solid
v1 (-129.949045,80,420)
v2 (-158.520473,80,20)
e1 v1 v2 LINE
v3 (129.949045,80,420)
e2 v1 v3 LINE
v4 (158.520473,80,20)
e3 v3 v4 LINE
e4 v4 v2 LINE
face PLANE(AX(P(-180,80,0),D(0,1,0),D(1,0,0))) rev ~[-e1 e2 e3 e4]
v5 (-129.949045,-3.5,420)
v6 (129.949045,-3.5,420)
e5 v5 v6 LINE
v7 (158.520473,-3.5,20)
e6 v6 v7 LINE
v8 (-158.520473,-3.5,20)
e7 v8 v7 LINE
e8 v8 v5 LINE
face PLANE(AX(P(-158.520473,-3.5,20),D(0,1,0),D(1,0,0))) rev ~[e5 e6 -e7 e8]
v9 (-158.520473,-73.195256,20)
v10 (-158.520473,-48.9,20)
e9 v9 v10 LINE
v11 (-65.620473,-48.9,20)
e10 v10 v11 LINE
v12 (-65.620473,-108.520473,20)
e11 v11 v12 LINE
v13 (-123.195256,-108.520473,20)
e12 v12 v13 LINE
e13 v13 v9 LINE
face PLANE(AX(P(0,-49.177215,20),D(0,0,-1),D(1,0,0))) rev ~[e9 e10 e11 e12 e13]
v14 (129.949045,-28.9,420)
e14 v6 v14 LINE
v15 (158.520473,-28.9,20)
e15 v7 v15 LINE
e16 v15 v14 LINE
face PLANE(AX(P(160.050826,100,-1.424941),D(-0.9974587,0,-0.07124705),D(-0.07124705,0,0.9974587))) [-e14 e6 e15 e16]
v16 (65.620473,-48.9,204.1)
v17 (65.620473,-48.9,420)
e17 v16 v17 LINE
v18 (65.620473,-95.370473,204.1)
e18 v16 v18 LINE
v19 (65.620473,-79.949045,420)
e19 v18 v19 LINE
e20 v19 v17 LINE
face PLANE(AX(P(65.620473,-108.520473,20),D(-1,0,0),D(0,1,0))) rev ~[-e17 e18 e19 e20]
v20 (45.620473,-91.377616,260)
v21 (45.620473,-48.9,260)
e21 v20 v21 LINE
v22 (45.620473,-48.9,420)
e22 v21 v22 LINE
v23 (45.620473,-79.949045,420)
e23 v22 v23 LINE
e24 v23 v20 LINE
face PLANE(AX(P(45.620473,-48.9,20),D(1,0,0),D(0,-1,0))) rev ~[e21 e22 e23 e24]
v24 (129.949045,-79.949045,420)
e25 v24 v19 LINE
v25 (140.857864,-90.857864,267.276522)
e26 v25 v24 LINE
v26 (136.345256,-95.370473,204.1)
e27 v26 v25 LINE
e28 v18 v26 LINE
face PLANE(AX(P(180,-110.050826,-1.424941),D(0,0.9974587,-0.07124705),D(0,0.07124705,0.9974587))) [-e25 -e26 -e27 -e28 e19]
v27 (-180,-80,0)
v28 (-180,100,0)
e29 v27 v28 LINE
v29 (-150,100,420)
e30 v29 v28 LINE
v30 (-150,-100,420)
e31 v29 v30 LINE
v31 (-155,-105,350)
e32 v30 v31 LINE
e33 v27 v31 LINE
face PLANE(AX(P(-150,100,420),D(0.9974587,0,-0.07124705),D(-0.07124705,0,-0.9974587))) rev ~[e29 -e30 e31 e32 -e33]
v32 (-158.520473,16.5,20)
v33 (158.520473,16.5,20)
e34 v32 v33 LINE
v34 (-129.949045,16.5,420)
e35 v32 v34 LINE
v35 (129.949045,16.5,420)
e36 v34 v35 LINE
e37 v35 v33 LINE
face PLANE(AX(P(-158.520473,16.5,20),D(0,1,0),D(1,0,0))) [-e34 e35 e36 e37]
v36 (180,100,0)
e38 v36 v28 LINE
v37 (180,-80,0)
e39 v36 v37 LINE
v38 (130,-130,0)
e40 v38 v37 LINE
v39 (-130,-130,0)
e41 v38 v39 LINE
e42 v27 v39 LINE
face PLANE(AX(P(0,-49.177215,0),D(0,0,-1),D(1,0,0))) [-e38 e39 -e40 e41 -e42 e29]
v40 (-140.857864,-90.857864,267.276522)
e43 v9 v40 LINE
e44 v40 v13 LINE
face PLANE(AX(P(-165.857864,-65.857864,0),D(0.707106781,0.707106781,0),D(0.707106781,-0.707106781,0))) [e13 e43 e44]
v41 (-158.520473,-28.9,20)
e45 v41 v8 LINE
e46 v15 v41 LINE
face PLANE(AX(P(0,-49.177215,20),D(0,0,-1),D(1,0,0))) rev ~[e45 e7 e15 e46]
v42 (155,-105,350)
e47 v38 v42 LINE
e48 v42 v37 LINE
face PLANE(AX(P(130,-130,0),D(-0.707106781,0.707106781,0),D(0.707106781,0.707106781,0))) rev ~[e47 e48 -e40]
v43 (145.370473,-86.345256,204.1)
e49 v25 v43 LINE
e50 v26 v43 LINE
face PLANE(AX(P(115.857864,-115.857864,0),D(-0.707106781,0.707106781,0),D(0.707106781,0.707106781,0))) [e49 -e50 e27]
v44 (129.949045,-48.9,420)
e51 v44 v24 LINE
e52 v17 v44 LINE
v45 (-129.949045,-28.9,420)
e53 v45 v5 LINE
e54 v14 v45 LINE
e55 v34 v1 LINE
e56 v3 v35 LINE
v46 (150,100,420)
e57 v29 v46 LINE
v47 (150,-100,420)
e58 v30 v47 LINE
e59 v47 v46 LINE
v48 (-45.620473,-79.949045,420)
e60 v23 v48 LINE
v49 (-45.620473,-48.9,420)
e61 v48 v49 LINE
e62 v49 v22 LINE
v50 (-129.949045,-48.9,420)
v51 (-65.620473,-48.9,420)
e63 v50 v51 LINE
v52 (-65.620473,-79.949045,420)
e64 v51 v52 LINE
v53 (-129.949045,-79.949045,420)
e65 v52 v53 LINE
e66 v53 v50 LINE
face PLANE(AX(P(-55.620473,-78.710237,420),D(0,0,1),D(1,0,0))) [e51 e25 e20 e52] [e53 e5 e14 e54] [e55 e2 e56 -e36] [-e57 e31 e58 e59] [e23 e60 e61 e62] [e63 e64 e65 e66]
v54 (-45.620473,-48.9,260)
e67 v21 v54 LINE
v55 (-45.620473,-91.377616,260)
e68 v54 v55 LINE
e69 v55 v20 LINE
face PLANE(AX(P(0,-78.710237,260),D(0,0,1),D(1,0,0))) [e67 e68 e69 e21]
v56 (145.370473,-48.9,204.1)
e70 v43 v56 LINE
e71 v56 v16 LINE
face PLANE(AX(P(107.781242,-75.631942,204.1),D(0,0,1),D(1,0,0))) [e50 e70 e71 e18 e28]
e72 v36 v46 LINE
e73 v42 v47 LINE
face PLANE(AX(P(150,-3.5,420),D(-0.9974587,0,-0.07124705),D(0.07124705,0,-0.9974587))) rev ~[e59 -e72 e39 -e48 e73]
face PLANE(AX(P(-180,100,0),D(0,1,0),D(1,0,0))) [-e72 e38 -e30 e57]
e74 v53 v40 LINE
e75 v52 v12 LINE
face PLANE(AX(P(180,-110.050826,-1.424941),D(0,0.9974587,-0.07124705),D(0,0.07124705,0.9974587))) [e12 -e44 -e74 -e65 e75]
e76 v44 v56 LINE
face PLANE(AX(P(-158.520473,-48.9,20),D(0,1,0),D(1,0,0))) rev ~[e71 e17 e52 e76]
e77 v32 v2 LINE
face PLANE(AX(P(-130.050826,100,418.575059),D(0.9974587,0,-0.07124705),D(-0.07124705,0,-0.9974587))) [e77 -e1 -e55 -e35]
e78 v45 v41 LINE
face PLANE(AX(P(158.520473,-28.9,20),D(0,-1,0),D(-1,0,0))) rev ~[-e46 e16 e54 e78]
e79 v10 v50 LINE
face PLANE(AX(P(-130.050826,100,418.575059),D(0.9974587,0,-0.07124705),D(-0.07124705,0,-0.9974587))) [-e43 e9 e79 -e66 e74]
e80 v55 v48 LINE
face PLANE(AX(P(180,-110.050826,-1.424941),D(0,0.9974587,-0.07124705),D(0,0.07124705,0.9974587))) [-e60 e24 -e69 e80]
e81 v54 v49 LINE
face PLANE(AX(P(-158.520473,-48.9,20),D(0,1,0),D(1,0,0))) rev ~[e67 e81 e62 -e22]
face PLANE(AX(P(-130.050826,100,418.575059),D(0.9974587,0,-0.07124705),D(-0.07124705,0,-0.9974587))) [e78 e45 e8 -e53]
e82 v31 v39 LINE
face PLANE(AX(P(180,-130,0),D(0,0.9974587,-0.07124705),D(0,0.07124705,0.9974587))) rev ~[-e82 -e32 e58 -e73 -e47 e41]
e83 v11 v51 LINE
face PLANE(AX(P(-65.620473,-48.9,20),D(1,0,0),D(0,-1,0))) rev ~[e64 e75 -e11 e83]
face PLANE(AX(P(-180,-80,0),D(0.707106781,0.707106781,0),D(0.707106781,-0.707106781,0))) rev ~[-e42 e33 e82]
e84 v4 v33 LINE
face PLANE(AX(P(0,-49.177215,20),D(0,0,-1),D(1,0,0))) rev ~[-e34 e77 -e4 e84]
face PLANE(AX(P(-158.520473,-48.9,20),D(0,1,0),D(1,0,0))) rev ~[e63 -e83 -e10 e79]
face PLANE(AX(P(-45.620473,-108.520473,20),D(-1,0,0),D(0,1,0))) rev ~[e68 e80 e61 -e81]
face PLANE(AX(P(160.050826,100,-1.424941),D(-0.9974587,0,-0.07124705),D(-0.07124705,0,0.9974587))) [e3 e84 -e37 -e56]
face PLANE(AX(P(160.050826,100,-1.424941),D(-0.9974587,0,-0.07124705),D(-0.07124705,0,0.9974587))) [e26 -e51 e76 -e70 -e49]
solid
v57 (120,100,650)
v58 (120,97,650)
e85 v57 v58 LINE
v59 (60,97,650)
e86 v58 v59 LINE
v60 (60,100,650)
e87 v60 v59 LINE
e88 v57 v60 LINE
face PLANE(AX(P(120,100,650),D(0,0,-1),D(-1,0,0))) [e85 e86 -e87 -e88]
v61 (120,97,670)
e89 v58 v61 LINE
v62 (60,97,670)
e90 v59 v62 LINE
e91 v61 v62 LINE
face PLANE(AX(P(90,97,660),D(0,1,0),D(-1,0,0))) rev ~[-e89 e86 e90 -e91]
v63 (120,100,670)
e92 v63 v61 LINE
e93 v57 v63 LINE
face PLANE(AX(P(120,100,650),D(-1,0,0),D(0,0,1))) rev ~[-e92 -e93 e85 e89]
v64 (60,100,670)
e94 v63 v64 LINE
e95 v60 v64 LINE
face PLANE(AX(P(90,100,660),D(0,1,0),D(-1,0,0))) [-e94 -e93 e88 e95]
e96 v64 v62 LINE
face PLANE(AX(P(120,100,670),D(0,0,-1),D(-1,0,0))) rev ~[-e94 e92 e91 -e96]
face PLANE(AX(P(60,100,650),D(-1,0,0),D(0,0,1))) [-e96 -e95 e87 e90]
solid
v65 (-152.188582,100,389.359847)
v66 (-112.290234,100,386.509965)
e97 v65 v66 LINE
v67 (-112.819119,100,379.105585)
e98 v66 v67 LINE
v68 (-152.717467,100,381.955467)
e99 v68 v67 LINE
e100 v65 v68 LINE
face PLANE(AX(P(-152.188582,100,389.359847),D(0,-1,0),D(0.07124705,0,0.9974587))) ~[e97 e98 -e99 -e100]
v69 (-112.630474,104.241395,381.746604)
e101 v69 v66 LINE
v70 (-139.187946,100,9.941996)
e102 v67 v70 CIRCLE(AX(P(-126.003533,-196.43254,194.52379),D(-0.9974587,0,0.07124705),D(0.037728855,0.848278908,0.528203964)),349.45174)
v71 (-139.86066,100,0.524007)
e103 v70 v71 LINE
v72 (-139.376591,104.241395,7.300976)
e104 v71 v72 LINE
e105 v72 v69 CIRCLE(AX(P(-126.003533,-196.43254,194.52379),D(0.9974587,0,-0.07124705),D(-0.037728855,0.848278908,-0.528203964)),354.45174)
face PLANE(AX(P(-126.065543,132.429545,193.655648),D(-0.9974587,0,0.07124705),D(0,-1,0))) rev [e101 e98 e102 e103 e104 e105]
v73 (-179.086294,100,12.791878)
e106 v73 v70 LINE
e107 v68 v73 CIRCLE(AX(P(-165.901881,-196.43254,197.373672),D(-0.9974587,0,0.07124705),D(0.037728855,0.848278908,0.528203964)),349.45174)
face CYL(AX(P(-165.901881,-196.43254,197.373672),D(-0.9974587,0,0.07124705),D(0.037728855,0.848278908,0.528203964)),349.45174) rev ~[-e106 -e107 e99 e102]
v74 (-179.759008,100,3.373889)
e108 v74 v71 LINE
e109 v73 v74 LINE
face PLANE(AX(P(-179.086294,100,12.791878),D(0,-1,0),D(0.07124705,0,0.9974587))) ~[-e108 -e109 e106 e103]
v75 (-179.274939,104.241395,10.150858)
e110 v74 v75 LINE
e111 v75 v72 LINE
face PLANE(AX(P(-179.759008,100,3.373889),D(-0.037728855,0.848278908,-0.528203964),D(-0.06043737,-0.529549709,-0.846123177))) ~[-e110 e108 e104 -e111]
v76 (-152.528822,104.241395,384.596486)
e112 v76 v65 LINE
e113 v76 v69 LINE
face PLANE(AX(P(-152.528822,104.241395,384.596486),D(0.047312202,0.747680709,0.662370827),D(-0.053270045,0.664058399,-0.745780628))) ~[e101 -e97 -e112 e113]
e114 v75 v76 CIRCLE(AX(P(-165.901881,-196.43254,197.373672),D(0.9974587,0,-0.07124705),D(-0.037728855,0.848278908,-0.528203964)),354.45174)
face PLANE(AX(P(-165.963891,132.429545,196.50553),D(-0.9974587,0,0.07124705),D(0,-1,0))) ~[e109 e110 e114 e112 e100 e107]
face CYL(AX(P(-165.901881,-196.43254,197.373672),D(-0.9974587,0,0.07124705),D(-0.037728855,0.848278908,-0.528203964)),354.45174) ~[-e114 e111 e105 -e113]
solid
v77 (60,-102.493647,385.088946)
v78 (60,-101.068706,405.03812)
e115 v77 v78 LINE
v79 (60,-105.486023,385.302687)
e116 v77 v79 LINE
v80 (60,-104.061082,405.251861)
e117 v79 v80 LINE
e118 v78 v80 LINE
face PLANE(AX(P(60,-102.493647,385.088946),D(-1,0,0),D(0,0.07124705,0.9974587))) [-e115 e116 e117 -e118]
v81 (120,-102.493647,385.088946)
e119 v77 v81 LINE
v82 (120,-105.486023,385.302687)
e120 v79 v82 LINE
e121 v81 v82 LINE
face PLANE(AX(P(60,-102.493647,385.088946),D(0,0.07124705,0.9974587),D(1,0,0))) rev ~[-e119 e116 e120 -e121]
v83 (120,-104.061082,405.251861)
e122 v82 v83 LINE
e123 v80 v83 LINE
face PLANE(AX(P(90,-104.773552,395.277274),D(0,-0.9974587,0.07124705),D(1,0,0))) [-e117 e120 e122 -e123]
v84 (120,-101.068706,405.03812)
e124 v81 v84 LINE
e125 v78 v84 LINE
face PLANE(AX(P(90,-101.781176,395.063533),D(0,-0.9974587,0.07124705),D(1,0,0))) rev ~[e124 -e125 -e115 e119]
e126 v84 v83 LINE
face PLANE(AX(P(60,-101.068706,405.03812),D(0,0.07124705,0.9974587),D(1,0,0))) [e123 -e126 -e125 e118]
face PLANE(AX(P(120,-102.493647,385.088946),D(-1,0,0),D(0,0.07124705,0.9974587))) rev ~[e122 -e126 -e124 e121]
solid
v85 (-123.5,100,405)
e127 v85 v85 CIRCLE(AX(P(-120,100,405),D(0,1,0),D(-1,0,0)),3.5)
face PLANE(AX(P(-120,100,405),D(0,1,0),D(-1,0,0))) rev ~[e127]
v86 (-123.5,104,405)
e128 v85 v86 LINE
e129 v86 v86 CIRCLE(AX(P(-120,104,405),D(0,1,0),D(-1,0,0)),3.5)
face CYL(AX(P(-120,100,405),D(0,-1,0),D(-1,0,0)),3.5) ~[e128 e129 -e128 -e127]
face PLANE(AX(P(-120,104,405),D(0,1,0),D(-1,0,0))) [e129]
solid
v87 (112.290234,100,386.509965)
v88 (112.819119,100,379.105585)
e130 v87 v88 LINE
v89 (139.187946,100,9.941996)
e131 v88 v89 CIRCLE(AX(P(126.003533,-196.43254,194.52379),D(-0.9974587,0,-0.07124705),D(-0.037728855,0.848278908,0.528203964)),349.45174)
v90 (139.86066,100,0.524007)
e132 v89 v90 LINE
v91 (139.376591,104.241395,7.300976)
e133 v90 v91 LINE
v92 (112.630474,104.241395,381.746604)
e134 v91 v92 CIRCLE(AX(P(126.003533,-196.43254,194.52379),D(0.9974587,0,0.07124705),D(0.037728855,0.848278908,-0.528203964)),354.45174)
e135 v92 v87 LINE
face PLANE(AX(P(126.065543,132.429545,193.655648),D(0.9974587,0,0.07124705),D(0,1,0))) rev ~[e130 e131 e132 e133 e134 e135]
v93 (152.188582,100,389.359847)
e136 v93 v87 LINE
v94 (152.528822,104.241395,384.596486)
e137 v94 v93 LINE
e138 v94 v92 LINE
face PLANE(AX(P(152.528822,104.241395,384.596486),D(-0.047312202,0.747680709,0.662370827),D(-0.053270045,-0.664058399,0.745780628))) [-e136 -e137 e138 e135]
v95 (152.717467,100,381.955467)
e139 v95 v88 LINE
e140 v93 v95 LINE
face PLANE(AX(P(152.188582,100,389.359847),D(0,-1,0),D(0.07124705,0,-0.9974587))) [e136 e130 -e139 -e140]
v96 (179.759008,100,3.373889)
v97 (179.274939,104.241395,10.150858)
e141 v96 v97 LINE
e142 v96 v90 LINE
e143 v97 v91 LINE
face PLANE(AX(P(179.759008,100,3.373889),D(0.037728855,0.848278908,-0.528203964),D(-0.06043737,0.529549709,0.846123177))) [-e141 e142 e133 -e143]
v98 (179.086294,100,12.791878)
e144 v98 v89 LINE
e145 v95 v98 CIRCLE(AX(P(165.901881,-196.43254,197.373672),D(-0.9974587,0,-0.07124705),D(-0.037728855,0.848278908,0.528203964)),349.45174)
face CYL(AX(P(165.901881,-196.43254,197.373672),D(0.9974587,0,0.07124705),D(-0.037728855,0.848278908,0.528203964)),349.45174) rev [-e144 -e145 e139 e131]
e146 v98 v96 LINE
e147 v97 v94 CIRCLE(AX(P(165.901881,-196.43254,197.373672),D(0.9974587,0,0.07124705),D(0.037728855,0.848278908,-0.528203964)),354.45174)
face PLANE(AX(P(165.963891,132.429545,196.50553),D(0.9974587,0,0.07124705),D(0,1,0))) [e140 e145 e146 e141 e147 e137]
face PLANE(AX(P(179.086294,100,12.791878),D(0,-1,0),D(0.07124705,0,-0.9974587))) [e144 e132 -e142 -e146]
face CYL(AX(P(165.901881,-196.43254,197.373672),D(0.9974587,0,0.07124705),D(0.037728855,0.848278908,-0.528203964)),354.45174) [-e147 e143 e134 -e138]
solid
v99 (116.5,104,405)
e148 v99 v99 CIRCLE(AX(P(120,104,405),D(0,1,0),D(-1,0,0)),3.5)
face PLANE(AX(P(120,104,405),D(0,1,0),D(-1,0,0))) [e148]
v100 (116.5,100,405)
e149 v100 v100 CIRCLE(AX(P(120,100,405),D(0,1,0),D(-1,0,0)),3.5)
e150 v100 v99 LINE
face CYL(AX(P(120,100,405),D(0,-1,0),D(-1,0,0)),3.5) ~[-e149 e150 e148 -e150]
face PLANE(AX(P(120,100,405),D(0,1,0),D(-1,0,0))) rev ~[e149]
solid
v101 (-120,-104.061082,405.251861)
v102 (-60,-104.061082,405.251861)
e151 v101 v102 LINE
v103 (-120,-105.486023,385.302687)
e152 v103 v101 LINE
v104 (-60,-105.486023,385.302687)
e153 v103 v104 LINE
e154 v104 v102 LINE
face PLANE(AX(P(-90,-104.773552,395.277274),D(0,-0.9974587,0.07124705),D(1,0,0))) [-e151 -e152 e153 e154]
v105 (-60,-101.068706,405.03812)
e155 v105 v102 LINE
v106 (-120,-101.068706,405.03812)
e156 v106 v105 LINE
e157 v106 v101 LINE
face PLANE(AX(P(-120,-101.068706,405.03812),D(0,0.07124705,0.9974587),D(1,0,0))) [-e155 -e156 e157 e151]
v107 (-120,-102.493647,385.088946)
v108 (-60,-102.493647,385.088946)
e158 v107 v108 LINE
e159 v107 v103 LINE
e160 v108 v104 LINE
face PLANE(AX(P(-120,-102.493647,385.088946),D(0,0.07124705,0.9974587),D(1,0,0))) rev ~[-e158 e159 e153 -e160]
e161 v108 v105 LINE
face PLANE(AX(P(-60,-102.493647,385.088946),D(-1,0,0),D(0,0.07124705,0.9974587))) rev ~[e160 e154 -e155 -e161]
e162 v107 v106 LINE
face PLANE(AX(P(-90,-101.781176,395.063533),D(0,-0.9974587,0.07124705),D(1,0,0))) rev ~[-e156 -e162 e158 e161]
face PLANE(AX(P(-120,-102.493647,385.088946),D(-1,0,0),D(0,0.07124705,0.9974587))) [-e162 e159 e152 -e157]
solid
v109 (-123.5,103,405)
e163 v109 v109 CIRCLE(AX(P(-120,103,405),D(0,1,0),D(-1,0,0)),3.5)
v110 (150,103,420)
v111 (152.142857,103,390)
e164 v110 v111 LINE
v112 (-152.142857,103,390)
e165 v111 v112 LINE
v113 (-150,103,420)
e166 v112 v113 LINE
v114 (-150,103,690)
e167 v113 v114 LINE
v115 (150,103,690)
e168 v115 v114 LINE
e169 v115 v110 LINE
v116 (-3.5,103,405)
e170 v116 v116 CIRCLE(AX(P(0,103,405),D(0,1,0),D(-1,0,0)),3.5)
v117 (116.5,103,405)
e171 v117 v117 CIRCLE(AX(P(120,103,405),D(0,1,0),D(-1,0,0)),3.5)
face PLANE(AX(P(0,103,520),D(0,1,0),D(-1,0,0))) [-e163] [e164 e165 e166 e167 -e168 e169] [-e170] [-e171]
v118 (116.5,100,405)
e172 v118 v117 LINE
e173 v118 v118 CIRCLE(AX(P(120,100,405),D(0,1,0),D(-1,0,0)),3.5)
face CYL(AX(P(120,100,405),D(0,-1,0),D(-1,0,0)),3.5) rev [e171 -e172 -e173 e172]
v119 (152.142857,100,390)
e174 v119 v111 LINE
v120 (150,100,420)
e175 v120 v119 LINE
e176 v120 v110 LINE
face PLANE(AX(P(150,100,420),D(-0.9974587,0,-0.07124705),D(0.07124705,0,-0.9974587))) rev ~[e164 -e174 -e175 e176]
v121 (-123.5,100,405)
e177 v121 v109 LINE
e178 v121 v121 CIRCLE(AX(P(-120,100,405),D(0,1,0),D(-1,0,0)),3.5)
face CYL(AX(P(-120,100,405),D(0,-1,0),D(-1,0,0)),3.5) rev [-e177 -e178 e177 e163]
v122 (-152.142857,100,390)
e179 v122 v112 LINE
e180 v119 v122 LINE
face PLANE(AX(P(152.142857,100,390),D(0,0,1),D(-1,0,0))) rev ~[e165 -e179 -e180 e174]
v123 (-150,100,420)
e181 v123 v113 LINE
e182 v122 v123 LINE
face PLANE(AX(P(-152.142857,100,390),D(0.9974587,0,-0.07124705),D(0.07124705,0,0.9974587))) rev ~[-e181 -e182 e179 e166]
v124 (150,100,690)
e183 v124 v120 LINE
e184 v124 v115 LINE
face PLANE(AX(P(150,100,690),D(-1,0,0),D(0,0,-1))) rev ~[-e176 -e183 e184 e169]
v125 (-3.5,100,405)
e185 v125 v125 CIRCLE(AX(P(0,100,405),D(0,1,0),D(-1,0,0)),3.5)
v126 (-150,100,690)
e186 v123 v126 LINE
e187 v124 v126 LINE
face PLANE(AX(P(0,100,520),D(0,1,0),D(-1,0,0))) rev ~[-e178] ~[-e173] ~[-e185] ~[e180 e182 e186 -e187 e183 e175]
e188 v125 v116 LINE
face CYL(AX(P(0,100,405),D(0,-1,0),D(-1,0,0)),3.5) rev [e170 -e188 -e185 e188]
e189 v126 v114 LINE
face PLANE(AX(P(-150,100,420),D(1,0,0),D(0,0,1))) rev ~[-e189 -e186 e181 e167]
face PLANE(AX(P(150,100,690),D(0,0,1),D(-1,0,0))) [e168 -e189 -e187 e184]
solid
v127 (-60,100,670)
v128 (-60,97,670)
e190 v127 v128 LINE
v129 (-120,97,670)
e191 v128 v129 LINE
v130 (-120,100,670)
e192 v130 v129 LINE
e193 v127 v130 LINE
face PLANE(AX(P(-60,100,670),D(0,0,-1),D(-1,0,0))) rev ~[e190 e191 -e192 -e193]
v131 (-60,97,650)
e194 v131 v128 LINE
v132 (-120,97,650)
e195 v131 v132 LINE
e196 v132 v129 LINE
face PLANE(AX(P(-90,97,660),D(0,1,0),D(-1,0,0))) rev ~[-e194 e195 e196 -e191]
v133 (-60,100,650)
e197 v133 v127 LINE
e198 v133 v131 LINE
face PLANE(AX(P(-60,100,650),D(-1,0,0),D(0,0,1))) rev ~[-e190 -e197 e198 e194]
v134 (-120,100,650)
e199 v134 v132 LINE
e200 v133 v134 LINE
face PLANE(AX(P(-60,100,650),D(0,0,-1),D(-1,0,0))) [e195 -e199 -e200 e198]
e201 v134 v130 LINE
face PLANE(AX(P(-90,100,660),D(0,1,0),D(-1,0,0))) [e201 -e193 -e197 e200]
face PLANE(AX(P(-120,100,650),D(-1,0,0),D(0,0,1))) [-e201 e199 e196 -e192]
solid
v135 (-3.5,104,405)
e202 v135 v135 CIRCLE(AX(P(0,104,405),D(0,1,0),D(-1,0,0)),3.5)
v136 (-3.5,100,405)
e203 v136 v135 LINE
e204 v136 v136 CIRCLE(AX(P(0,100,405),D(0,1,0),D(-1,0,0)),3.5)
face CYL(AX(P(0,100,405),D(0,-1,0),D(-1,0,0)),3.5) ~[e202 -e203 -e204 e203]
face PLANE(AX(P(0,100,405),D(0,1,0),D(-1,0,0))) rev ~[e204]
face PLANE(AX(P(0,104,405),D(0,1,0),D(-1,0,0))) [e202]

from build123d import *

# Parameters (mm, degrees)
F0_W      = 300
F0_H      = 200
F1_DEPTH  = 420
F3_DEPTH  = 420
F5_DEPTH  = 360
F7_DEPTH  = 230.001
F9_DEPTH  = 1000
F10_T     = -20
F11_W     = 317.0409461497
F11_H     = 20
F12_DEPTH = 400
F13_DEPTH = 25
F14_DEPTH = 25
F15_DEPTH = 400
F16_DEPTH = 400
F17_DEPTH = 25
F18_DEPTH = 25
F19_DEPTH = 184.1
F20_DEPTH = 240
F22_W     = 300
F22_H     = 200
F22_R     = 3.5
F22_H_2   = 70
F22_W_2   = 60
F22_H_3   = 20
F23_DEPTH = 3
F24_DEPTH = 3
F21_W     = 60
F21_H     = 20
F25_DEPTH = 3
F27_DEPTH = 40
F28_DEPTH = 4


# Not quite as in the source:
# - a pattern or mirror of a feature is missing from the dataset's text; its kind, count and spacing are read off the source's solid


with BuildPart() as f1:
    # F0 (on Top) → F1 (new body)
    with BuildSketch(Plane.XY):
        Rectangle(F0_W, F0_H)
    extrude(amount=F1_DEPTH)

    # F2 (on face) → F3 (join)
    with BuildSketch(Plane(origin=(0, 0, 0), x_dir=(1, 0, 0), z_dir=(0, 0, -1))):
        Polygon((-180, -100), (-150, -100), (-150, 100), (150, 100), (150, -100), (180, -100), (180, 130), (-180, 130), align=None)
    extrude(amount=-F3_DEPTH)

    # F4 (on face) → F5 (cut, through all)
    with BuildSketch(Plane.YZ.offset(180)):
        Polygon((-130, 0), (-100, 420), (-130, 420), align=None)
    extrude(amount=-F5_DEPTH, mode=Mode.SUBTRACT)

    # F6 (on face) → F7 (cut, through all)
    with BuildSketch(Plane(origin=(0, 100, 0), x_dir=(-1, 0, 0), z_dir=(0, 1, 0))):
        Polygon((-180, 0), (-150, 420), (-180, 420), align=None)
        Polygon((180, 420), (150, 420), (180, 0), align=None)
    extrude(amount=-F7_DEPTH, mode=Mode.SUBTRACT)

    # F8 (on face) → F9 (cut)
    with BuildSketch(Plane(origin=(0, 0, 0), x_dir=(1, 0, 0), z_dir=(0, 0, -1))):
        Polygon((-180, 80), (-130, 130), (-180, 130), align=None)
        Polygon((180, 130), (130, 130), (180, 80), align=None)
    extrude(amount=-F9_DEPTH, mode=Mode.SUBTRACT)

    # F10
    f10_openings = [f1.faces().sort_by_distance(p)[0] for p in [
        (0, 0, 420),
    ]]
    offset(amount=F10_T, openings=f10_openings)

    # F11 (on face) → F12 (join)
    with BuildSketch(Plane.XY.offset(20)):
        with Locations((0, 6.5)):
            Rectangle(F11_W, F11_H)
    extrude(amount=F12_DEPTH)

    # F13 (cut): a face of the model
    f13_faces = [f1.faces().sort_by_distance(p)[0] for p in [
        (-155.6803153832, -3.5, 380.2377923175),
    ]]
    extrude(f13_faces, amount=-F13_DEPTH, mode=Mode.SUBTRACT)

    # F14 (cut): a face of the model
    f14_faces = [f1.faces().sort_by_distance(p)[0] for p in [
        (155.6803153832, -3.5, 380.2377923175),
    ]]
    extrude(f14_faces, amount=-F14_DEPTH, mode=Mode.SUBTRACT)

    # F11 (on face) → F15 (join)
    with BuildSketch(Plane.XY.offset(20)):
        Polygon((158.5204730748, -28.9), (-158.5204730748, -28.9), (-158.5204730748, -48.9), (-65.6204730748, -48.9), (-45.6204730748, -48.9), (45.6204730748, -48.9), (65.6204730748, -48.9), (158.5204730748, -48.9), align=None)
    extrude(amount=F15_DEPTH)

    # F11 (on face) → F16 (join)
    with BuildSketch(Plane.XY.offset(20)):
        Polygon((-45.6204730748, -48.9), (-65.6204730748, -48.9), (-65.6204730748, -83.5204730748), (-65.6204730748, -108.5204730748), (-45.6204730748, -108.5204730748), (-45.6204730748, -83.5204730748), align=None)
        Polygon((65.6204730748, -83.5204730748), (65.6204730748, -48.9), (45.6204730748, -48.9), (45.6204730748, -83.5204730748), (45.6204730748, -108.5204730748), (65.6204730748, -108.5204730748), align=None)
    extrude(amount=F16_DEPTH)

    # F17 (cut): faces of the model
    f17_faces = [f1.faces().sort_by_distance(p)[0] for p in [
        (-155.6803153832, -48.9, 380.2377923175),
        (155.6803153832, -48.9, 380.2377923175),
    ]]
    extrude(f17_faces, amount=-F17_DEPTH, mode=Mode.SUBTRACT)

    # F18 (cut): faces of the model
    f18_faces = [f1.faces().sort_by_distance(p)[0] for p in [
        (-65.6204730748, -105.6803153832, 380.2377923175),
        (45.6204730748, -105.6803153832, 380.2377923175),
    ]]
    extrude(f18_faces, amount=-F18_DEPTH, mode=Mode.SUBTRACT)

    # F11 (on face) → F19 (join)
    with BuildSketch(Plane.XY.offset(20)):
        Polygon((158.5204730748, -73.1952556777), (158.5204730748, -48.9), (65.6204730748, -48.9), (65.6204730748, -83.5204730748), (65.6204730748, -108.5204730748), (123.1952556777, -108.5204730748), align=None)
    extrude(amount=F19_DEPTH)

    # F11 (on face) → F20 (join)
    with BuildSketch(Plane.XY.offset(20)):
        Polygon((45.6204730748, -48.9), (-45.6204730748, -48.9), (-45.6204730748, -83.5204730748), (-45.6204730748, -108.5204730748), (45.6204730748, -108.5204730748), (45.6204730748, -83.5204730748), align=None)
    extrude(amount=F20_DEPTH)


with BuildPart() as f23:
    # F22 (on face) → F23 (new body)
    with BuildSketch(Plane(origin=(0, 100, 0), x_dir=(-1, 0, 0), z_dir=(0, 1, 0))):
        with Locations((0, 520)):
            Rectangle(F22_W, F22_H)
        Polygon((-150, 420), (-152.1428571429, 390), (152.1428571429, 390), (150, 420), align=None)
        with Locations((-120, 405)):
            Circle(F22_R, mode=Mode.SUBTRACT)
        with Locations((0, 405)):
            Circle(F22_R, mode=Mode.SUBTRACT)
        with Locations((120, 405)):
            Circle(F22_R, mode=Mode.SUBTRACT)
        with Locations((0, 655)):
            Rectangle(F22_W, F22_H_2)
        with Locations((-90, 660)):
            Rectangle(F22_W_2, F22_H_3, mode=Mode.SUBTRACT)
        with Locations((90, 660)):
            Rectangle(F22_W_2, F22_H_3, mode=Mode.SUBTRACT)
        with Locations((-90, 660)):
            Rectangle(F22_W_2, F22_H_3)
        with Locations((90, 660)):
            Rectangle(F22_W_2, F22_H_3)
    extrude(amount=F23_DEPTH)


with BuildPart() as f24:
    # F22 (on face) → F24 (new body)
    with BuildSketch(Plane(origin=(0, 100, 0), x_dir=(-1, 0, 0), z_dir=(0, 1, 0))):
        with Locations((90, 660)):
            Rectangle(F22_W_2, F22_H_3)
    extrude(amount=-F24_DEPTH)


with BuildPart() as f24b:
    # F22 (on face) → F24, piece 2 (new body)
    with BuildSketch(Plane(origin=(0, 100, 0), x_dir=(-1, 0, 0), z_dir=(0, 1, 0))):
        with Locations((-90, 660)):
            Rectangle(F22_W_2, F22_H_3)
    extrude(amount=-F24_DEPTH)


with BuildPart() as f25:
    # F21 (on face) → F25 (new body)
    with BuildSketch(Plane(origin=(0, -129.3401015228, 9.2385786802), x_dir=(1, 0, 0), z_dir=(0, -0.9974586998, 0.07124705))):
        with Locations((-90, 386.8079489301)):
            Rectangle(F21_W, F21_H)
    extrude(amount=F25_DEPTH)


with BuildPart() as f25b:
    # F21 (on face) → F25, piece 2 (new body)
    with BuildSketch(Plane(origin=(0, -129.3401015228, 9.2385786802), x_dir=(1, 0, 0), z_dir=(0, -0.9974586998, 0.07124705))):
        with Locations((90, 386.8079489301)):
            Rectangle(F21_W, F21_H)
    extrude(amount=F25_DEPTH)


with BuildPart() as f27:
    # F26 (on face) → F27 (new body)
    with BuildSketch(Plane(origin=(179.0862944162, 0, 12.7918781726), x_dir=(0, 1, 0), z_dir=(0.9974586998, 0, 0.07124705))):
        with BuildLine():
            ThreePointArc((100, 370.1041340828), (153.0191995097, 185.0520670414), (100, 0))
            Line((100, 0), (100, -9.441984234))
            Line((100, -9.441984234), (104.241394541, -2.6477485431))
            ThreePointArc((104.241394541, -2.6477485431), (158.0191995097, 185.0520670414), (104.241394541, 372.7518826259))
            Line((104.241394541, 372.7518826259), (100, 377.5273796043))
            Line((100, 377.5273796043), (100, 370.1041340828))
        make_face()
    extrude(amount=-F27_DEPTH)


with BuildPart() as f27_copies_1:
    # F27_copies: instance of F27
    add(f27.part.mirror(Plane(origin=(0, 0, 0), x_dir=(0, 0, -1), z_dir=(-1, 0, 0))))


with BuildPart() as f28:
    # F22 (on face) → F28 (new body)
    with BuildSketch(Plane(origin=(0, 100, 0), x_dir=(-1, 0, 0), z_dir=(0, 1, 0))):
        with Locations((-120, 405)):
            Circle(F22_R)
    extrude(amount=F28_DEPTH)


with BuildPart() as f28b:
    # F22 (on face) → F28, piece 2 (new body)
    with BuildSketch(Plane(origin=(0, 100, 0), x_dir=(-1, 0, 0), z_dir=(0, 1, 0))):
        with Locations((0, 405)):
            Circle(F22_R)
    extrude(amount=F28_DEPTH)


with BuildPart() as f28c:
    # F22 (on face) → F28, piece 3 (new body)
    with BuildSketch(Plane(origin=(0, 100, 0), x_dir=(-1, 0, 0), z_dir=(0, 1, 0))):
        with Locations((120, 405)):
            Circle(F22_R)
    extrude(amount=F28_DEPTH)


solid = Compound([f1.part, f23.part, f24.part, f24b.part, f25.part, f25b.part, f27.part, f27_copies_1.part, f28.part, f28b.part, f28c.part])
